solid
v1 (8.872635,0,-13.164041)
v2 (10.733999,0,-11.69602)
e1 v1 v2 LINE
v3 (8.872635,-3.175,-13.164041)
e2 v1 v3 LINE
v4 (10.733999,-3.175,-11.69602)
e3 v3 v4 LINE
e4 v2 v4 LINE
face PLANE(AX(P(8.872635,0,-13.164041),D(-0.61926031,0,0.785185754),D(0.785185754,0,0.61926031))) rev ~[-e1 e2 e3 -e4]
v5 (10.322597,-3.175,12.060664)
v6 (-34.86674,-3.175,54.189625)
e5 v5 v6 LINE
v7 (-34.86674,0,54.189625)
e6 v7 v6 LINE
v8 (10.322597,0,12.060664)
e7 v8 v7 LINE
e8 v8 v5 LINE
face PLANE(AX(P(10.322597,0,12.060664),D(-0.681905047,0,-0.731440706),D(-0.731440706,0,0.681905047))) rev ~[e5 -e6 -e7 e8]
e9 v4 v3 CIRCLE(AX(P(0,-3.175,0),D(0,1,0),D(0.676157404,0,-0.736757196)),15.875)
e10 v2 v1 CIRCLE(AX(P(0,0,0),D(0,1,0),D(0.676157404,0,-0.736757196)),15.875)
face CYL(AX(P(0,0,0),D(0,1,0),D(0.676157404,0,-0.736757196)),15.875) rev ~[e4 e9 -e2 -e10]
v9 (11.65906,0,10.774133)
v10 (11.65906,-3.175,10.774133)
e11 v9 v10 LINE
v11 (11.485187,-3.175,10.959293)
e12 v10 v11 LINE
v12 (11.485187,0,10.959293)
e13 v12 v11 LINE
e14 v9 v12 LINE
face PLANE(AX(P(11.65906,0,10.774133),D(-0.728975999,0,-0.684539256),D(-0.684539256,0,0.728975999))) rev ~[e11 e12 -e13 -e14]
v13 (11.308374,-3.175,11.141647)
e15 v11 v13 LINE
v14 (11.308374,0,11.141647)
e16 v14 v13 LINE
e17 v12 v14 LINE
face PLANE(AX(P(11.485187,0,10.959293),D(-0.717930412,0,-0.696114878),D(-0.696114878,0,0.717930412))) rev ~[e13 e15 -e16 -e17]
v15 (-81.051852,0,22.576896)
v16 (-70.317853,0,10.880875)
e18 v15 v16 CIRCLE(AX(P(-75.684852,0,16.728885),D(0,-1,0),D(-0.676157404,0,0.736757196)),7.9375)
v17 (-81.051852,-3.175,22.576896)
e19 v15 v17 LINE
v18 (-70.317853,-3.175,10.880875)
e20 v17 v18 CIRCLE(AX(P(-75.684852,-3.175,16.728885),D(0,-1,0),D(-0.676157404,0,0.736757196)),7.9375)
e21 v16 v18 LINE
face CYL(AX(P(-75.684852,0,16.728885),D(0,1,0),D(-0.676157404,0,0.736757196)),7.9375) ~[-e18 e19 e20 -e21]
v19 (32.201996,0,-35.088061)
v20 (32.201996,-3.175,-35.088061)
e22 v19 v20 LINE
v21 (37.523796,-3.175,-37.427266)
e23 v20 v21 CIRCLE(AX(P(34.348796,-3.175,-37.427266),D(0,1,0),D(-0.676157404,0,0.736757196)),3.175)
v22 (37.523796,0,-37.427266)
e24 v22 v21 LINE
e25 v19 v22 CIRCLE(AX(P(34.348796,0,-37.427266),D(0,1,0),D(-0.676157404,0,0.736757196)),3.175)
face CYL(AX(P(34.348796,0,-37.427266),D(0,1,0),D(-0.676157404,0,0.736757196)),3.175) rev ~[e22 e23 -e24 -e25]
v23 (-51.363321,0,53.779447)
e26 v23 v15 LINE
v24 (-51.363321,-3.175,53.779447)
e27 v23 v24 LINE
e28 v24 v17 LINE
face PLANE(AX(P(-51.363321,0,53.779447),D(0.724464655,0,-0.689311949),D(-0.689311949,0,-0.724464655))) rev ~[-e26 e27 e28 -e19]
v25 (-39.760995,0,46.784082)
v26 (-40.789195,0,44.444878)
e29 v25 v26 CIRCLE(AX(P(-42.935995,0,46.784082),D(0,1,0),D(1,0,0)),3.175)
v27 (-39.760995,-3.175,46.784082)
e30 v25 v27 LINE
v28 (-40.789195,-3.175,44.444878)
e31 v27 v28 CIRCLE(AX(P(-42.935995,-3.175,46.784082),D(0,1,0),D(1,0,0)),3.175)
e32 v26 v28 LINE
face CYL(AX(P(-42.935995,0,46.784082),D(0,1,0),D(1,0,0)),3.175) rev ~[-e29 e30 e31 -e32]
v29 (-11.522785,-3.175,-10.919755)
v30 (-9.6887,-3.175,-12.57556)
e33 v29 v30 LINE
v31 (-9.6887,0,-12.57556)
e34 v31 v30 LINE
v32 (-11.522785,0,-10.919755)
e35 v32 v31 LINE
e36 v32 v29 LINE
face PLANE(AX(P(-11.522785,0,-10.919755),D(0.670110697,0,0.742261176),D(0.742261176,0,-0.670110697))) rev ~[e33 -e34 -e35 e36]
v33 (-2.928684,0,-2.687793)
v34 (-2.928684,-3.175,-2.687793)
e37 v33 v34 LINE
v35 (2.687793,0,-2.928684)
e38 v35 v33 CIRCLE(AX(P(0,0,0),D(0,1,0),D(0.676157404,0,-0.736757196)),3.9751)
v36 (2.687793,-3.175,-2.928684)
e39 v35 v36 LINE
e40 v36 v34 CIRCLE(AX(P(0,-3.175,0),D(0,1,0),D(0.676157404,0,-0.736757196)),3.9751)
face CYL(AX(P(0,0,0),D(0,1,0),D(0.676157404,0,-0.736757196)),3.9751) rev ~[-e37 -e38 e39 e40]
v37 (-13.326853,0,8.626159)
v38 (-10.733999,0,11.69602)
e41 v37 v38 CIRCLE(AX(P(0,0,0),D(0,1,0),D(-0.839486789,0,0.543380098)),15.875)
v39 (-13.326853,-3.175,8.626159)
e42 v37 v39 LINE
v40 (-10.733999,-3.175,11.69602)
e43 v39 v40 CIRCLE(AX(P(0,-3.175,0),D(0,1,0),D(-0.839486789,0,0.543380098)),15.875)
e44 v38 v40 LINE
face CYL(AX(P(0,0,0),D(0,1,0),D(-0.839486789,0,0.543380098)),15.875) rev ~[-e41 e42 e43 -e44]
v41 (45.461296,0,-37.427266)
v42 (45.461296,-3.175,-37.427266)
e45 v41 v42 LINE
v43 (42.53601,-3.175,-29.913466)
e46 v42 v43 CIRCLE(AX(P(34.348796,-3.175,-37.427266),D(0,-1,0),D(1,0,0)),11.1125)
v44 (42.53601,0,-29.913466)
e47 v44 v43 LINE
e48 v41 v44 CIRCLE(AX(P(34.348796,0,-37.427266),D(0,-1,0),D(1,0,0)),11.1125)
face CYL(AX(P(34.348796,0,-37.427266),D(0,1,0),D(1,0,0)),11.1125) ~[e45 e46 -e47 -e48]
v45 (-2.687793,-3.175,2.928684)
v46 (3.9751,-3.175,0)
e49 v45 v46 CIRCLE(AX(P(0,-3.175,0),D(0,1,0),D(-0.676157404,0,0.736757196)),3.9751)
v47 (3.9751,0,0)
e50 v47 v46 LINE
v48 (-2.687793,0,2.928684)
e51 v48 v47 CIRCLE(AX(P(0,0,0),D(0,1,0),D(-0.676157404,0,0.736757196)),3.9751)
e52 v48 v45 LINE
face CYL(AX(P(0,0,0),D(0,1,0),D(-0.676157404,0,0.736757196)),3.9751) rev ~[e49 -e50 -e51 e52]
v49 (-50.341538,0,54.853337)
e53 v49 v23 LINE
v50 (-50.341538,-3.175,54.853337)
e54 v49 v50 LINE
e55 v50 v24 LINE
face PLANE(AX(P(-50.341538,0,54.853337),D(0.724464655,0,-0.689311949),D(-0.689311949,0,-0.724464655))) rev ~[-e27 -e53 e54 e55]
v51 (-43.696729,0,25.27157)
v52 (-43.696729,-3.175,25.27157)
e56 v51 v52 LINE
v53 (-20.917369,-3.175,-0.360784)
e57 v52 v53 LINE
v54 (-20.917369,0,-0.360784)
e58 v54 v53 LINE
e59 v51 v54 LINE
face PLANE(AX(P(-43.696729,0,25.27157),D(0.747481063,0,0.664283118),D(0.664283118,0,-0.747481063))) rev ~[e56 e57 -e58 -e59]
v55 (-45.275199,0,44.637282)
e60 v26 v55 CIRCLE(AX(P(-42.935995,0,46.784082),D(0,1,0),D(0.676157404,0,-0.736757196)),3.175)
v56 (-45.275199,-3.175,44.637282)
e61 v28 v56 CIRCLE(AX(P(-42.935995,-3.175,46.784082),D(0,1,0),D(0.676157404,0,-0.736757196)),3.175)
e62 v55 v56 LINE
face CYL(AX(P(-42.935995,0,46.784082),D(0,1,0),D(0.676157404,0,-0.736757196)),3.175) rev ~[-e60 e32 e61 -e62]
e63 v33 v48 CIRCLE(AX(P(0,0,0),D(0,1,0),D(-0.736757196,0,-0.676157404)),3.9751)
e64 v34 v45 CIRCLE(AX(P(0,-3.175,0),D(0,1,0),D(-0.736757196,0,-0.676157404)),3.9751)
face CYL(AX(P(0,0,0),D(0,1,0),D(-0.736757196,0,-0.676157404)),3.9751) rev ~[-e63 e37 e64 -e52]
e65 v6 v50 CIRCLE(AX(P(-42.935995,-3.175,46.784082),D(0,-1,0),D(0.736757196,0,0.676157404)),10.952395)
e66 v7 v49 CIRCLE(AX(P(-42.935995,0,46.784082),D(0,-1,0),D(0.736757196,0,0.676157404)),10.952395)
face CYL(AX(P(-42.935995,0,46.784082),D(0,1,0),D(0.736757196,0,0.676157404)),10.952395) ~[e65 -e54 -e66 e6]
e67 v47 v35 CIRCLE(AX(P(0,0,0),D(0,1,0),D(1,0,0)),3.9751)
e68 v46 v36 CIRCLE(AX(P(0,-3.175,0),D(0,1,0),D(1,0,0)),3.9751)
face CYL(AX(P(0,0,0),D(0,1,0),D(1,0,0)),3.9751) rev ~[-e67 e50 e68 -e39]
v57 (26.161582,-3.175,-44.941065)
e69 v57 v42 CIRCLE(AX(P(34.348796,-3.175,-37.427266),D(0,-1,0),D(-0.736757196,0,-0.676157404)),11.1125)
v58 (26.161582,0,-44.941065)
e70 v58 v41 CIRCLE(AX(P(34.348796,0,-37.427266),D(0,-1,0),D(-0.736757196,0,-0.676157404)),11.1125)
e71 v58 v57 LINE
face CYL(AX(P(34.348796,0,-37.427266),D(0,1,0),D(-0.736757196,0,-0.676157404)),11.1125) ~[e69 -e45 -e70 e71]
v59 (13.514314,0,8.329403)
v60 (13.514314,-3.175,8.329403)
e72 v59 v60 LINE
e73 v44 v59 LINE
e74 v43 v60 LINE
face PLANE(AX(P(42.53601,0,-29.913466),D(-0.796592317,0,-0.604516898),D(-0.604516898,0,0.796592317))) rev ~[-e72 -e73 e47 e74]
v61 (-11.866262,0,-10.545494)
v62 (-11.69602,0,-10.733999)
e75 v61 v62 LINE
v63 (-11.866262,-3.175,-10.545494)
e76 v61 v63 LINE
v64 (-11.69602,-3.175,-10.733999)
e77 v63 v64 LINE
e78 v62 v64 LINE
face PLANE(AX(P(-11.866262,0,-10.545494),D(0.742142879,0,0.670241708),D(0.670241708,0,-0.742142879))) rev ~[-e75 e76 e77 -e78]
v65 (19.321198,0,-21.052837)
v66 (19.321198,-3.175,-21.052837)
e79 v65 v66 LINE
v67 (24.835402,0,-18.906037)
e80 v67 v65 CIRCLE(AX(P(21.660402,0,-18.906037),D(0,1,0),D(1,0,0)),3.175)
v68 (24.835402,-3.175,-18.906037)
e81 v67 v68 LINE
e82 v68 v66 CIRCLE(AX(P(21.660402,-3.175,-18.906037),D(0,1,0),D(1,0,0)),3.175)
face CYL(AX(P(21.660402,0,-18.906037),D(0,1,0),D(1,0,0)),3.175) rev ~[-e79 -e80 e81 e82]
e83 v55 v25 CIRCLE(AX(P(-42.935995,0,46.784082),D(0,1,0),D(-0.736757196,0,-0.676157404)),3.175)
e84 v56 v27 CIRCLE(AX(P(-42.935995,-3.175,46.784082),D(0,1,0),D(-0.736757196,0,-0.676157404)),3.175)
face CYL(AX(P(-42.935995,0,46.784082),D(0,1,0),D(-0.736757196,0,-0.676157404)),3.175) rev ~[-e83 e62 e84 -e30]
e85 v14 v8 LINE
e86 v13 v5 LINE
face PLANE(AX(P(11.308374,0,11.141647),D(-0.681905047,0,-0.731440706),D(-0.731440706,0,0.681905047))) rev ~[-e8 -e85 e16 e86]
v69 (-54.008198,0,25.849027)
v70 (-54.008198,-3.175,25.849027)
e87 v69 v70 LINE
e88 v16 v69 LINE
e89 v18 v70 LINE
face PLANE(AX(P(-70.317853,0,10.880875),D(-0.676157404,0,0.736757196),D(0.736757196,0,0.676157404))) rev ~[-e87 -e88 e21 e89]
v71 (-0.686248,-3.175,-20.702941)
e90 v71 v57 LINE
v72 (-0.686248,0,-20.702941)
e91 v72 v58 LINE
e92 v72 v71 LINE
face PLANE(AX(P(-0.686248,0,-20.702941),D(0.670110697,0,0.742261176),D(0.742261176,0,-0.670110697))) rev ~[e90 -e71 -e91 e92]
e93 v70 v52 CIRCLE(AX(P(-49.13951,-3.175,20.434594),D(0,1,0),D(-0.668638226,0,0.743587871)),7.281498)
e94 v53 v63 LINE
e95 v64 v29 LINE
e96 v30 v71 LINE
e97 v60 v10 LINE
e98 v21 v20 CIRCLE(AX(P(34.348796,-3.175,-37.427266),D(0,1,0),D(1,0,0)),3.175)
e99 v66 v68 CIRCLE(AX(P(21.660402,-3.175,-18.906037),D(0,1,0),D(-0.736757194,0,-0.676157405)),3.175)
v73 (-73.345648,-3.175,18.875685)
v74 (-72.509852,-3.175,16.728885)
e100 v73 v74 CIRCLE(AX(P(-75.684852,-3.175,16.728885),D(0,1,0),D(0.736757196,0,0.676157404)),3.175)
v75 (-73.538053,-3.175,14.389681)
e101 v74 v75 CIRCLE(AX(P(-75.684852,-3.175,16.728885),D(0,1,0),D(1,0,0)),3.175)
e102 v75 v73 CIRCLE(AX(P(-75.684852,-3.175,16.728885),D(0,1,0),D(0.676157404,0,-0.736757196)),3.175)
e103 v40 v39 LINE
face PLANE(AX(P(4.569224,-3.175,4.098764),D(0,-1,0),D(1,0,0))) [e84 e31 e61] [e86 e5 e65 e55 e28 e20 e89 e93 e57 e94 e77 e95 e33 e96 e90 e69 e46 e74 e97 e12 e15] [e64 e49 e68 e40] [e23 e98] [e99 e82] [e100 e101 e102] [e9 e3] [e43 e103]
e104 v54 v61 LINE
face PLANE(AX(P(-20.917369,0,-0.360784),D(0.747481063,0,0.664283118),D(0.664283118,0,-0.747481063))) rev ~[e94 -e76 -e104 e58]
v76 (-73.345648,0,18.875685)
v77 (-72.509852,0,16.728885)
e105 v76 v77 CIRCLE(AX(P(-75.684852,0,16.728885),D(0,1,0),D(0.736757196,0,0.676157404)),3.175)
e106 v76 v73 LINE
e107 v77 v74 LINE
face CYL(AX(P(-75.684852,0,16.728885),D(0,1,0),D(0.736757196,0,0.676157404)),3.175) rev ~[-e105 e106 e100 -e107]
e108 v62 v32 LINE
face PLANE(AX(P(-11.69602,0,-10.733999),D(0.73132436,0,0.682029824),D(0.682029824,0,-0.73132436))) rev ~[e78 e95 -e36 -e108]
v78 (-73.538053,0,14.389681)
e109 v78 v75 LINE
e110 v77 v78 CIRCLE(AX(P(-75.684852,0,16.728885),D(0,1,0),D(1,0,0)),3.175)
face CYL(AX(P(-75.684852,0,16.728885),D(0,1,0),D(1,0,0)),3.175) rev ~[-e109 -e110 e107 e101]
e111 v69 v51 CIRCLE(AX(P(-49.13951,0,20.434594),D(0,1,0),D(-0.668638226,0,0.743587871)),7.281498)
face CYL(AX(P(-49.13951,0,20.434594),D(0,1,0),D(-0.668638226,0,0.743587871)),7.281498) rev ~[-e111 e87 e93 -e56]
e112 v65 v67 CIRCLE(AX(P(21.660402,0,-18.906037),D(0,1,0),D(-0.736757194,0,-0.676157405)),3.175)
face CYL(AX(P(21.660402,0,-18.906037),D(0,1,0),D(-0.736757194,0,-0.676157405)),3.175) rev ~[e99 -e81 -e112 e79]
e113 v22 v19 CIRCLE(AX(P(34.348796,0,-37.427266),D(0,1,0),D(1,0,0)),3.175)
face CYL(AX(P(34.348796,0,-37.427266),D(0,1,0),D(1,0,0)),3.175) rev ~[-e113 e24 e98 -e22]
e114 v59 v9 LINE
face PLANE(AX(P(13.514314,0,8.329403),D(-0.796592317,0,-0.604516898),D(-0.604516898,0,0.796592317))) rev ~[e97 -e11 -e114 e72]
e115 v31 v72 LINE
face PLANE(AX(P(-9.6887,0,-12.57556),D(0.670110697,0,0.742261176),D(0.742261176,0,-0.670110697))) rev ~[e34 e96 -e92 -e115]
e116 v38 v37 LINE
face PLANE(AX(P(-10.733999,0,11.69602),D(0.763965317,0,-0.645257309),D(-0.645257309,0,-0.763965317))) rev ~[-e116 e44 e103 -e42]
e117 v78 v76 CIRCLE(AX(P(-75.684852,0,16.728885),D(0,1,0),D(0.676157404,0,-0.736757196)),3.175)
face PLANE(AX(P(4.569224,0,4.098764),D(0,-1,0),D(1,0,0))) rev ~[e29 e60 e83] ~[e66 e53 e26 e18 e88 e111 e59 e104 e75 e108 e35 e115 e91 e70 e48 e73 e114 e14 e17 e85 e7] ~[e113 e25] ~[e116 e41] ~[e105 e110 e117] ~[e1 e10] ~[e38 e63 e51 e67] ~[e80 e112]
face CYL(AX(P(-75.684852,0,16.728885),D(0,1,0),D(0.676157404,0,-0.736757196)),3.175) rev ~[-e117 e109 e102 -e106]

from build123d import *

# Parameters (mm, degrees)
F1_DEPTH = 3.175


with BuildPart() as f1:
    # F0 (on Front) → F1 (new body)
    with BuildSketch(Plane.XZ):
        with BuildLine():
            ThreePointArc((-2.6877932952, 2.9286835289), (1.5995582019, 3.6390704265), (3.9751, 0))
            ThreePointArc((3.9751, 0), (3.6390704265, -1.5995582019), (2.6877932952, -2.9286835289))
            Line((2.6877932952, -2.9286835289), (10.7339987827, -11.6960204828))
            ThreePointArc((10.7339987827, -11.6960204828), (14.5330288597, -6.3880119883), (15.875, 0))
            ThreePointArc((15.875, 0), (15.2734304328, 4.3287351287), (13.5143136611, 8.3294028158))
            Line((13.5143136611, 8.3294028158), (11.6590601378, 10.7741329908))
            Line((11.6590601378, 10.7741329908), (11.4851871667, 10.9592928944))
            Line((11.4851871667, 10.9592928944), (11.3083739877, 11.1416472191))
            Line((11.3083739877, 11.1416472191), (10.3225973322, 12.0606637179))
            ThreePointArc((10.3225973322, 12.0606637179), (-0.2748708071, 15.8726201693), (-10.7339987827, 11.6960204828))
            Line((-10.7339987827, 11.6960204828), (-2.6877932952, 2.9286835289))
        make_face()
        with BuildLine():
            ThreePointArc((-2.9286835289, -2.6877932952), (-3.9714488487, 0.1703351178), (-2.6877932952, 2.9286835289))
            Line((-2.6877932952, 2.9286835289), (-10.7339987827, 11.6960204828))
            Line((-10.7339987827, 11.6960204828), (-13.3268527784, 8.6261590538))
            ThreePointArc((-13.3268527784, 8.6261590538), (-15.8291292061, -1.2059409505), (-11.8662618768, -10.5454944915))
            Line((-11.8662618768, -10.5454944915), (-11.6960204828, -10.7339987827))
            Line((-11.6960204828, -10.7339987827), (-2.9286835289, -2.6877932952))
        make_face()
        with BuildLine():
            Line((10.7339987827, -11.6960204828), (2.6877932952, -2.9286835289))
            ThreePointArc((2.6877932952, -2.9286835289), (-0.1703351178, -3.9714488487), (-2.9286835289, -2.6877932952))
            Line((-2.9286835289, -2.6877932952), (-11.6960204828, -10.7339987827))
            Line((-11.6960204828, -10.7339987827), (-11.5227849075, -10.9197551701))
            Line((-11.5227849075, -10.9197551701), (-9.6887004006, -12.5755600093))
            ThreePointArc((-9.6887004006, -12.5755600093), (-0.5030588817, -15.8670273448), (8.8726348179, -13.1640410357))
            Line((8.8726348179, -13.1640410357), (10.7339987827, -11.6960204828))
        make_face()
        with BuildLine():
            Line((-35.5304524208, 38.714826384), (-10.7339987827, 11.6960204828))
            ThreePointArc((-10.7339987827, 11.6960204828), (-0.2748708071, 15.8726201693), (10.3225973322, 12.0606637179))
            Line((10.3225973322, 12.0606637179), (-34.8667395835, 54.189624641))
            ThreePointArc((-34.8667395835, 54.189624641), (-32.7298053677, 50.7575739011), (-31.9836005106, 46.7840819312))
            ThreePointArc((-31.9836005106, 46.7840819312), (-32.9094460222, 42.3768990566), (-35.5304524208, 38.714826384))
        make_face()
        with BuildLine():
            ThreePointArc((-13.3268527784, 8.6261590538), (-12.1279494046, 10.2434597788), (-10.7339987827, 11.6960204828))
            Line((-10.7339987827, 11.6960204828), (-35.5304524208, 38.714826384))
            ThreePointArc((-35.5304524208, 38.714826384), (-43.4053109787, 35.8417471462), (-51.0052506778, 39.3785392213))
            Line((-51.0052506778, 39.3785392213), (-69.8368422411, 22.0958847311))
            ThreePointArc((-69.8368422411, 22.0958847311), (-68.2881475559, 19.6085836711), (-67.7473524824, 16.7288853397))
            ThreePointArc((-67.7473524824, 16.7288853397), (-68.4183380526, 13.5348793456), (-70.3178530911, 10.8808750983))
            Line((-70.3178530911, 10.8808750983), (-54.0081981098, 25.8490274689))
            ThreePointArc((-54.0081981098, 25.8490274689), (-48.7323738618, 27.7047005709), (-43.6967288942, 25.2715700939))
            Line((-43.6967288942, 25.2715700939), (-20.9173687453, -0.3607843802))
            Line((-20.9173687453, -0.3607843802), (-13.3268527784, 8.6261590538))
        make_face()
        with BuildLine():
            Line((19.3211978133, -21.0528368739), (10.7339987827, -11.6960204828))
            ThreePointArc((10.7339987827, -11.6960204828), (9.830757416, -12.4648238507), (8.8726348179, -13.1640410357))
            Line((8.8726348179, -13.1640410357), (-0.6862483149, -20.7029410933))
            Line((-0.6862483149, -20.7029410933), (26.1615817665, -44.9410646928))
            ThreePointArc((26.1615817665, -44.9410646928), (23.2465029972, -36.9510890975), (26.8349969566, -29.240051207))
            Line((26.8349969566, -29.240051207), (19.3211978133, -21.0528368739))
        make_face()
        with BuildLine():
            ThreePointArc((15.875, 0), (14.5330288597, -6.3880119883), (10.7339987827, -11.6960204828))
            Line((10.7339987827, -11.6960204828), (19.3211978133, -21.0528368739))
            Line((19.3211978133, -21.0528368739), (26.8349969566, -29.240051207))
            ThreePointArc((26.8349969566, -29.240051207), (34.824972552, -26.3249724376), (42.5360104425, -29.9134663971))
            Line((42.5360104425, -29.9134663971), (13.5143136611, 8.3294028158))
            ThreePointArc((13.5143136611, 8.3294028158), (15.2734304328, 4.3287351287), (15.875, 0))
        make_face()
        with BuildLine():
            ThreePointArc((24.8354019053, -18.9060371125), (22.812281241, -21.8647190819), (19.3211978133, -21.0528368739))
            ThreePointArc((19.3211978133, -21.0528368739), (20.5085225697, -15.9473551431), (24.8354019053, -18.9060371125))
        make_face(mode=Mode.SUBTRACT)
        with BuildLine():
            ThreePointArc((-11.8662618768, -10.5454944915), (-15.8291292061, -1.2059409505), (-13.3268527784, 8.6261590538))
            Line((-13.3268527784, 8.6261590538), (-20.9173687453, -0.3607843802))
            Line((-20.9173687453, -0.3607843802), (-11.8662618768, -10.5454944915))
        make_face()
        with BuildLine():
            ThreePointArc((-51.0052506778, 39.3785392213), (-43.4053109787, 35.8417471462), (-35.5304524208, 38.714826384))
            Line((-35.5304524208, 38.714826384), (-40.7891953741, 44.4448778346))
            ThreePointArc((-40.7891953741, 44.4448778346), (-43.0720455442, 43.6119981862), (-45.2751992272, 44.6372821746))
            Line((-45.2751992272, 44.6372821746), (-51.0052506778, 39.3785392213))
        make_face()
        with BuildLine():
            Line((-40.7891953741, 44.4448778346), (-35.5304524208, 38.714826384))
            ThreePointArc((-35.5304524208, 38.714826384), (-32.9094460222, 42.3768990566), (-31.9836005106, 46.7840819312))
            ThreePointArc((-31.9836005106, 46.7840819312), (-32.7298053677, 50.7575739011), (-34.8667395835, 54.189624641))
            ThreePointArc((-34.8667395835, 54.189624641), (-42.4666792826, 57.7264167162), (-50.3415378405, 54.8533374783))
            Line((-50.3415378405, 54.8533374783), (-51.3633206037, 53.7794470598))
            ThreePointArc((-51.3633206037, 53.7794470598), (-53.8850057244, 46.5118413574), (-51.0052506778, 39.3785392213))
            Line((-51.0052506778, 39.3785392213), (-45.2751992272, 44.6372821746))
            ThreePointArc((-45.2751992272, 44.6372821746), (-44.0878744632, 49.7427639018), (-39.7609951306, 46.7840819312))
            ThreePointArc((-39.7609951306, 46.7840819312), (-40.0293893587, 45.5064795335), (-40.7891953741, 44.4448778346))
        make_face()
        with BuildLine():
            Line((-0.6862483149, -20.7029410933), (8.8726348179, -13.1640410357))
            ThreePointArc((8.8726348179, -13.1640410357), (-0.5030588817, -15.8670273448), (-9.6887004006, -12.5755600093))
            Line((-9.6887004006, -12.5755600093), (-0.6862483149, -20.7029410933))
        make_face()
        with BuildLine():
            Line((-69.8368422411, 22.0958847311), (-51.0052506778, 39.3785392213))
            ThreePointArc((-51.0052506778, 39.3785392213), (-53.8850057244, 46.5118413574), (-51.3633206037, 53.7794470598))
            Line((-51.3633206037, 53.7794470598), (-81.0518518738, 22.5768955811))
            ThreePointArc((-81.0518518738, 22.5768955811), (-75.3447264485, 24.6590947021), (-69.8368422411, 22.0958847311))
        make_face()
        with BuildLine():
            ThreePointArc((42.5360104425, -29.9134663971), (34.824972552, -26.3249724376), (26.8349969566, -29.240051207))
            ThreePointArc((26.8349969566, -29.240051207), (23.2465029972, -36.9510890975), (26.1615817665, -44.9410646928))
            ThreePointArc((26.1615817665, -44.9410646928), (38.3803737684, -47.7826524421), (45.4612961045, -37.4272655449))
            ThreePointArc((45.4612961045, -37.4272655449), (44.7041830017, -33.3956878811), (42.5360104425, -29.9134663971))
        make_face()
        with BuildLine():
            ThreePointArc((37.5237961045, -37.4272655449), (33.0711937068, -40.3338713169), (32.201996348, -35.0880614484))
            ThreePointArc((32.201996348, -35.0880614484), (35.6263985022, -34.520659773), (37.5237961045, -37.4272655449))
        make_face(mode=Mode.SUBTRACT)
        with BuildLine():
            ThreePointArc((-67.7473524824, 16.7288853397), (-68.2881475559, 19.6085836711), (-69.8368422411, 22.0958847311))
            Line((-69.8368422411, 22.0958847311), (-73.3456483859, 18.8756850963))
            ThreePointArc((-73.3456483859, 18.8756850963), (-72.7261705118, 17.8807646723), (-72.5098524824, 16.7288853397))
            ThreePointArc((-72.5098524824, 16.7288853397), (-72.7782467105, 15.4512829421), (-73.5380527259, 14.3896812432))
            Line((-73.5380527259, 14.3896812432), (-70.3178530911, 10.8808750983))
            ThreePointArc((-70.3178530911, 10.8808750983), (-68.4183380526, 13.5348793456), (-67.7473524824, 16.7288853397))
        make_face()
        with BuildLine():
            Line((-73.3456483859, 18.8756850963), (-69.8368422411, 22.0958847311))
            ThreePointArc((-69.8368422411, 22.0958847311), (-75.3447264485, 24.6590947021), (-81.0518518738, 22.5768955811))
            ThreePointArc((-81.0518518738, 22.5768955811), (-81.5328627238, 11.3618859484), (-70.3178530911, 10.8808750983))
            Line((-70.3178530911, 10.8808750983), (-73.5380527259, 14.3896812432))
            ThreePointArc((-73.5380527259, 14.3896812432), (-78.8569362274, 16.8649357533), (-73.3456483859, 18.8756850963))
        make_face()
    extrude(amount=F1_DEPTH)


solid = f1.part
